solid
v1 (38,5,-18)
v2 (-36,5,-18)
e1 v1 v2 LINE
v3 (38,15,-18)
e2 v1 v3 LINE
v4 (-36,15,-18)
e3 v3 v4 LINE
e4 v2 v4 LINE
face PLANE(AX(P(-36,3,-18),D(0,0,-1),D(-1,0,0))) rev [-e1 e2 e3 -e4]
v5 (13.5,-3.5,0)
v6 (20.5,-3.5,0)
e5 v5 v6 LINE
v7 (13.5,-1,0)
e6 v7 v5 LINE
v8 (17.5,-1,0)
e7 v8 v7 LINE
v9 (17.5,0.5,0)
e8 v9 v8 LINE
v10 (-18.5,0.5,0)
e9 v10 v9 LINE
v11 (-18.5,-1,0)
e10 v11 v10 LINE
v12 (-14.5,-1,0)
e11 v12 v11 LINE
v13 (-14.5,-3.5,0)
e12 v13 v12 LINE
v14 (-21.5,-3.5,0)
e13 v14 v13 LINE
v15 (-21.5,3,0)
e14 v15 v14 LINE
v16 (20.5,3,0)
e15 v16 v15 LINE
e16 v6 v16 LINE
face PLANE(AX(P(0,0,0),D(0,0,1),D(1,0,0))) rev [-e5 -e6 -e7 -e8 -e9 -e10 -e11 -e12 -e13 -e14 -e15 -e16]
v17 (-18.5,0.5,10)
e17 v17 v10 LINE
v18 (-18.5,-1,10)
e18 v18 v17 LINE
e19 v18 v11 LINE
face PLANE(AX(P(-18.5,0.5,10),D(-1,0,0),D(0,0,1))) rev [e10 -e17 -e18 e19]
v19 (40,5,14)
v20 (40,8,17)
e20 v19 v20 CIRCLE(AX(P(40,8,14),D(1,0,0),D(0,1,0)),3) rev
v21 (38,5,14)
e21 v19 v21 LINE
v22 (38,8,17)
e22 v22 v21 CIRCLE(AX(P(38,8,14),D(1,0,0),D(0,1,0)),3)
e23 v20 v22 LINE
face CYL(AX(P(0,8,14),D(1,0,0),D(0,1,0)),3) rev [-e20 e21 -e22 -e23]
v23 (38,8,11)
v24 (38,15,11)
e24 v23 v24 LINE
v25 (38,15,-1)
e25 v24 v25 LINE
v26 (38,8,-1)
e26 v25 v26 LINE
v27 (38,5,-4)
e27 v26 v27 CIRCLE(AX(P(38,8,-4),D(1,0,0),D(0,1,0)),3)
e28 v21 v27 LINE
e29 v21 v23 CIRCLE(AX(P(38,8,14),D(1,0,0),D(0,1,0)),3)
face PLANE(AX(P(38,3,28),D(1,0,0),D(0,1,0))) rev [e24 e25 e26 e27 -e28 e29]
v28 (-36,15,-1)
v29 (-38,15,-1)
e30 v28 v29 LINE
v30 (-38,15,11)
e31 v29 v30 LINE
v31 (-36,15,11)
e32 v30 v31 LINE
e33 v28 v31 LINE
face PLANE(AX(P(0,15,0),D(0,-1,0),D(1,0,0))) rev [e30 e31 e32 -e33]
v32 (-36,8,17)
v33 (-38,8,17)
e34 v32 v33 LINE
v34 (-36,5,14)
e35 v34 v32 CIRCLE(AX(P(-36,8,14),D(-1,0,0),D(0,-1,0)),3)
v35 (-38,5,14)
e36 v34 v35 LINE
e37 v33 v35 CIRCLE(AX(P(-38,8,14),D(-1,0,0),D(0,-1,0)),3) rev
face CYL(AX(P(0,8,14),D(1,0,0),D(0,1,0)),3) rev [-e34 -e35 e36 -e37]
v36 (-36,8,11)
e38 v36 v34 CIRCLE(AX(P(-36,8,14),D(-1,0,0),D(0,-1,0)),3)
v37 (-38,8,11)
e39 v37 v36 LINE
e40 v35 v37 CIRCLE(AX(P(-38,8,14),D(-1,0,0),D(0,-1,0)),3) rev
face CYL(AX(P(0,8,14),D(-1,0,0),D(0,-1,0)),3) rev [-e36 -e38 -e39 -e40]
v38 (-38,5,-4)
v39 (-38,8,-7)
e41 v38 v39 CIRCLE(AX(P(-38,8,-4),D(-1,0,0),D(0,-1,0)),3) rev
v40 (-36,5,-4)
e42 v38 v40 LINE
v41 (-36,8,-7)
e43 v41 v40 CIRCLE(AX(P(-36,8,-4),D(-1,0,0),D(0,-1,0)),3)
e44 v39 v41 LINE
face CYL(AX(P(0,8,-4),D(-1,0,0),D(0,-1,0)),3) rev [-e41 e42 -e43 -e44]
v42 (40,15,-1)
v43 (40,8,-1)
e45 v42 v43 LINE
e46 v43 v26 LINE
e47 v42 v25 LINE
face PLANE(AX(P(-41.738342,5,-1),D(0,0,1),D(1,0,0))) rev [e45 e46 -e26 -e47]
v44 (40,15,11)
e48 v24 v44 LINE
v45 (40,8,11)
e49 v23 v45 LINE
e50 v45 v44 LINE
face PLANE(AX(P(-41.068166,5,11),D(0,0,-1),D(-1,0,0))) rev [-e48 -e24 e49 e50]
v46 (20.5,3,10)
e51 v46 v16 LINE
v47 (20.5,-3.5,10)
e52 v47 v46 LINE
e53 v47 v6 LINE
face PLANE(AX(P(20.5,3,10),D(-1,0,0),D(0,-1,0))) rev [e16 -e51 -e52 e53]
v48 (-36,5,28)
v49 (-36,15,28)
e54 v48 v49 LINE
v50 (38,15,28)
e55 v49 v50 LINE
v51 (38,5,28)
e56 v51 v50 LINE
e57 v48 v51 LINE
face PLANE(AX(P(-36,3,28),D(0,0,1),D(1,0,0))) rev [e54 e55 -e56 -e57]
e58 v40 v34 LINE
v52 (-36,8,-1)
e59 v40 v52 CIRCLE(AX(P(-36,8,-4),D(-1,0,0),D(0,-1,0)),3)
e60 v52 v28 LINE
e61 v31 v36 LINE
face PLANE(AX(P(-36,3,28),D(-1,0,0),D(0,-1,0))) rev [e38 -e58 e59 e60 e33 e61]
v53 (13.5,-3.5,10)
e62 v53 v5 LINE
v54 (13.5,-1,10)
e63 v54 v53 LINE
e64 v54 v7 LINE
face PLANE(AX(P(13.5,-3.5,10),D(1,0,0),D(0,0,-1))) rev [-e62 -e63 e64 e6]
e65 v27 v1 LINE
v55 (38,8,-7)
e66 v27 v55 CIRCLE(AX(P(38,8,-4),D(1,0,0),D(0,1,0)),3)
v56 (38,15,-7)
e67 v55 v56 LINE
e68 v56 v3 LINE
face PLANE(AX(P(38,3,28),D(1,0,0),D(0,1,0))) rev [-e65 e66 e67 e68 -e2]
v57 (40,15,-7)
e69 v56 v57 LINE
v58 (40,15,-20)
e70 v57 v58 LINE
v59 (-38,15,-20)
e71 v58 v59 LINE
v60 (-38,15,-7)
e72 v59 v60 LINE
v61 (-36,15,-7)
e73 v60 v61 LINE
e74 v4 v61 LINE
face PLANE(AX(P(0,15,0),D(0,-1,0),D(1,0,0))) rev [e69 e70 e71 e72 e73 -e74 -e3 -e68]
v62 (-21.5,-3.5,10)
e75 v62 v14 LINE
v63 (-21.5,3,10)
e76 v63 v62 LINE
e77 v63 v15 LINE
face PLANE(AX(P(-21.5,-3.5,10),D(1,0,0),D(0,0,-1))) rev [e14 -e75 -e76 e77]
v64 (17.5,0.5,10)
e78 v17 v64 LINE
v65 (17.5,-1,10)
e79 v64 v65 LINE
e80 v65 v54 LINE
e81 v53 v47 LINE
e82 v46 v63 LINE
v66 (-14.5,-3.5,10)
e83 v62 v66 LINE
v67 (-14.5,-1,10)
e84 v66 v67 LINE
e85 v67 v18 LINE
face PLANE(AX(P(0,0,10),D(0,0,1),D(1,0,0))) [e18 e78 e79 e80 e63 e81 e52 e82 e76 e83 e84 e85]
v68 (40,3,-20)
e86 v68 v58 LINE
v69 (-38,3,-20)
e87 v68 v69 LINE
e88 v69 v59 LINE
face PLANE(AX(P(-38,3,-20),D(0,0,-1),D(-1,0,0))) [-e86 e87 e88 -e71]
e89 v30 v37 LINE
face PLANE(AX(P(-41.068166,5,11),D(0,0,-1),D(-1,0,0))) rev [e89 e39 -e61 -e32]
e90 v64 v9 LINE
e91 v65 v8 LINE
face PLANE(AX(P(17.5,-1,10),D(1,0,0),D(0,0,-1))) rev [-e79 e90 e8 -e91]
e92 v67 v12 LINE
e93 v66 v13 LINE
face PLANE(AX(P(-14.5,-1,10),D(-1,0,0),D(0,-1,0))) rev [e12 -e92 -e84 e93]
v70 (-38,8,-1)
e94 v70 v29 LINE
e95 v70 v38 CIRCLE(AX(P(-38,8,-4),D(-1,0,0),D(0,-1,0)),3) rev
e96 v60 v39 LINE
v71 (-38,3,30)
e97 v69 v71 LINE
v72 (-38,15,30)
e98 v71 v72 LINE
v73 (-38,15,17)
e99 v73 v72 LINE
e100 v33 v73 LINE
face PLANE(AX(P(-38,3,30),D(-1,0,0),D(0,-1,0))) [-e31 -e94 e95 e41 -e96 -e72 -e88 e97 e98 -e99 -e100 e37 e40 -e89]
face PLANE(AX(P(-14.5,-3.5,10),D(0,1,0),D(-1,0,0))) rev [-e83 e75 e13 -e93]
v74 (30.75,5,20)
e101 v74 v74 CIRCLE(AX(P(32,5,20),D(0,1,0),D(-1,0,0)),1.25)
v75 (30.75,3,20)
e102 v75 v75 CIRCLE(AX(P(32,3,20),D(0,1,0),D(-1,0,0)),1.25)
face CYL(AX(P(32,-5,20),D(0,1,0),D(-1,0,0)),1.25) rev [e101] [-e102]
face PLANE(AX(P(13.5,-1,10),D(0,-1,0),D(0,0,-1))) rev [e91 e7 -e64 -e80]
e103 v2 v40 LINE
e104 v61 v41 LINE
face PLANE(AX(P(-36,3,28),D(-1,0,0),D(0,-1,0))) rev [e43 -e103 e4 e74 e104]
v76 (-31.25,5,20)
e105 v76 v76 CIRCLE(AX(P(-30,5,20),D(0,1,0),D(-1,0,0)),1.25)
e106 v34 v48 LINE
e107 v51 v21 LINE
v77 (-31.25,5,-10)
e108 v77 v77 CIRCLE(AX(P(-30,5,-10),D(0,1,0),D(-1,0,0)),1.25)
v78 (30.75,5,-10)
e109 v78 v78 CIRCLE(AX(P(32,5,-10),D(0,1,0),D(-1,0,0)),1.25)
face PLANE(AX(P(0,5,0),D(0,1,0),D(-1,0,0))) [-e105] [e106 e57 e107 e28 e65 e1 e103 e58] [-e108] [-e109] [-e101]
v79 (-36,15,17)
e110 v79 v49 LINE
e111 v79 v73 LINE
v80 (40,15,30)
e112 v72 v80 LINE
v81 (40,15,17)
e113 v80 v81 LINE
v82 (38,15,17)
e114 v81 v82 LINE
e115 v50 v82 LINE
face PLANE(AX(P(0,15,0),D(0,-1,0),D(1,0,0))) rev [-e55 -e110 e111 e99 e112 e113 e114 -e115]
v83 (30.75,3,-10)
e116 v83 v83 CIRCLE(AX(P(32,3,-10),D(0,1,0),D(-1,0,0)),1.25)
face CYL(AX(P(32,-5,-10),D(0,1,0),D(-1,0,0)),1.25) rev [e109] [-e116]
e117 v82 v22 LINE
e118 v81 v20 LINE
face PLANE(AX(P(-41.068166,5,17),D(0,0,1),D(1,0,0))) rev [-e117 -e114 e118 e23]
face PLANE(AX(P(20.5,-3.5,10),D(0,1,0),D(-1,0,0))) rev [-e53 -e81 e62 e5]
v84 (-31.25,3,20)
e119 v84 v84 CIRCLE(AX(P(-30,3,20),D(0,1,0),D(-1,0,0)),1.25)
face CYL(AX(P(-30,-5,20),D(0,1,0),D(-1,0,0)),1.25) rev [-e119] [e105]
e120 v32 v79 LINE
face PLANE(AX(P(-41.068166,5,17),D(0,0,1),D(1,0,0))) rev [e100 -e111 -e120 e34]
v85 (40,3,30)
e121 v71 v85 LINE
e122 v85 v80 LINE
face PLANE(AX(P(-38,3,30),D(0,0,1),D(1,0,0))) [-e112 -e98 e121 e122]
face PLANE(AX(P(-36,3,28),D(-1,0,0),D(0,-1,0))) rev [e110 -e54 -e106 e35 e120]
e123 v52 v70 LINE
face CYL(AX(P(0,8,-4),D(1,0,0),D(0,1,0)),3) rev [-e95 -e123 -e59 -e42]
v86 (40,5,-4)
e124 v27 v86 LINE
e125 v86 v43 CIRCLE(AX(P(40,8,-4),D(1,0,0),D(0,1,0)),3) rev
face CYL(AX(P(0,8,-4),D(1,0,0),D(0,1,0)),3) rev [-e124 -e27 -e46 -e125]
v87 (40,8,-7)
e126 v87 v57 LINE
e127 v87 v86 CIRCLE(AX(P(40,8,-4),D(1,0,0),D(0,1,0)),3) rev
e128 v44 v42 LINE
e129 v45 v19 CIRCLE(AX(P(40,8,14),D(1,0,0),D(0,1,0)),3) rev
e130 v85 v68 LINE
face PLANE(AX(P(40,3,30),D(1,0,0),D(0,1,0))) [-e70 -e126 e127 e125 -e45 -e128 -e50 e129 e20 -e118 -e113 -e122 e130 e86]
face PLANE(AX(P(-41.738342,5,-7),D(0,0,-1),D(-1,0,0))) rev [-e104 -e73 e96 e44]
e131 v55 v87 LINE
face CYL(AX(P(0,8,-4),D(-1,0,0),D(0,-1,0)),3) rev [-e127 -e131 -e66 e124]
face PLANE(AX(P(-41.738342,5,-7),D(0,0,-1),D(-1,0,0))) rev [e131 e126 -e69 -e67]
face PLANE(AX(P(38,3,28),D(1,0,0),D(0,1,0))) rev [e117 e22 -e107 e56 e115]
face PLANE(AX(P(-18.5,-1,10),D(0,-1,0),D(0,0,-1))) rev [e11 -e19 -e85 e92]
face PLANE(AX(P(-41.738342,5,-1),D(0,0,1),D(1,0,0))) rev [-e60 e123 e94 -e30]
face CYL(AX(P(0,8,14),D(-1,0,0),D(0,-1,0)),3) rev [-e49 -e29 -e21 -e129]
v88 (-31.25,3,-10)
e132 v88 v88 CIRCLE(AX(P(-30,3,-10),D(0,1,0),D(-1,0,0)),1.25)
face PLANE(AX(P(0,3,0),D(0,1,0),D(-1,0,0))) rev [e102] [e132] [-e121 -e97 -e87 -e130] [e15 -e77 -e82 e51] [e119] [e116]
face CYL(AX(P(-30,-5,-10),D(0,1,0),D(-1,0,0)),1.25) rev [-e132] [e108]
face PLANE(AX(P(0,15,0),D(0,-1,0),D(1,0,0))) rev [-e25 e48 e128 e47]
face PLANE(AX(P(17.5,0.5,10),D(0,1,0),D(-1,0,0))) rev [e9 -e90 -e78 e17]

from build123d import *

# Parameters (mm, degrees)
BOSS_EXTRUDE1_DEPTH      = 10
SKETCH3_W                = 74
SKETCH3_H                = 46
BOSS_EXTRUDE2_DEPTH      = 2
SKETCH4_R                = 1.25
CUT_EXTRUDE1_DEPTH       = 10
BOSS_EXTRUDE3_DEPTH      = 10
BOSS_EXTRUDE3_DEPTH_BACK = 2
SKETCH5_W                = 78
SKETCH5_H                = 50
SKETCH5_W_2              = 74
SKETCH5_H_2              = 46
SKETCH9_W                = 86.285123911
SKETCH9_H                = 6
SKETCH9_W_2              = 83.939508892
CUT_EXTRUDE2_DEPTH       = 10
FILLET1_R                = 3


with BuildPart() as part:
    # Sketch2 → Boss-Extrude1 (new body)
    with BuildSketch(Plane.XY):
        Polygon((-18.5, 0.5), (-18.5, -1), (-14.5, -1), (-14.5, -3.5), (-21.5, -3.5), (-21.5, -1), (-21.5, 3), (20.5, 3), (20.5, -3.5), (13.5, -3.5), (13.5, -1), (17.5, -1), (17.5, 0.5), align=None)
    extrude(amount=BOSS_EXTRUDE1_DEPTH)

    # Sketch3 → Boss-Extrude2 (add)
    with BuildSketch(Plane(origin=(0, 3, 0), x_dir=(1, 0, 0), z_dir=(0, 1, 0))):
        with Locations((1, -5)):
            Rectangle(SKETCH3_W, SKETCH3_H)
    extrude(amount=BOSS_EXTRUDE2_DEPTH)

    # Sketch4 → Cut-Extrude1 (cut)
    with BuildSketch(Plane(origin=(0, 5, 0), x_dir=(1, 0, 0), z_dir=(0, 1, 0))):
        with Locations(Location((-30, 10, 0), (0, 0, 180))):
            Circle(SKETCH4_R)
        with Locations(Location((-30, -20, 0), (0, 0, 180))):
            Circle(SKETCH4_R)
        with Locations(Location((32, 10, 0), (0, 0, 180))):
            Circle(SKETCH4_R)
        with Locations(Location((32, -20, 0), (0, 0, 180))):
            Circle(SKETCH4_R)
    extrude(amount=-CUT_EXTRUDE1_DEPTH, mode=Mode.SUBTRACT)

    # Sketch5 → Boss-Extrude3 (add, two sides: drawn at the far end of the back side and taken through both)
    with BuildSketch(Plane(origin=(0, 5, 0), x_dir=(1, 0, 0), z_dir=(0, 1, 0)).offset(-BOSS_EXTRUDE3_DEPTH_BACK)):
        with Locations((1, -5)):
            Rectangle(SKETCH5_W, SKETCH5_H)
        with Locations((1, -5)):
            Rectangle(SKETCH5_W_2, SKETCH5_H_2, mode=Mode.SUBTRACT)
    extrude(amount=BOSS_EXTRUDE3_DEPTH + BOSS_EXTRUDE3_DEPTH_BACK)

    # Sketch9 → Cut-Extrude2 (cut)
    with BuildSketch(Plane(origin=(0, 15, 0), x_dir=(1, 0, 0), z_dir=(0, 1, 0))):
        with Locations((1.40422043, 4)):
            Rectangle(SKETCH9_W, SKETCH9_H)
        with Locations((0.90158864, -14)):
            Rectangle(SKETCH9_W_2, SKETCH9_H)
    extrude(amount=-CUT_EXTRUDE2_DEPTH, mode=Mode.SUBTRACT)

    # Fillet1
    fillet1_edges = [part.edges().sort_by_distance(p)[0] for p in [
        (-37, 5, 17),
        (-37, 5, 11),
        (-37, 5, -7),
        (-37, 5, -1),
        (39, 5, 17),
        (39, 5, 11),
        (39, 5, -7),
        (39, 5, -1),
    ]]
    fillet(fillet1_edges, radius=FILLET1_R - 0.0001)  # a hair under: the kernel refuses the full size


solid = part.part
